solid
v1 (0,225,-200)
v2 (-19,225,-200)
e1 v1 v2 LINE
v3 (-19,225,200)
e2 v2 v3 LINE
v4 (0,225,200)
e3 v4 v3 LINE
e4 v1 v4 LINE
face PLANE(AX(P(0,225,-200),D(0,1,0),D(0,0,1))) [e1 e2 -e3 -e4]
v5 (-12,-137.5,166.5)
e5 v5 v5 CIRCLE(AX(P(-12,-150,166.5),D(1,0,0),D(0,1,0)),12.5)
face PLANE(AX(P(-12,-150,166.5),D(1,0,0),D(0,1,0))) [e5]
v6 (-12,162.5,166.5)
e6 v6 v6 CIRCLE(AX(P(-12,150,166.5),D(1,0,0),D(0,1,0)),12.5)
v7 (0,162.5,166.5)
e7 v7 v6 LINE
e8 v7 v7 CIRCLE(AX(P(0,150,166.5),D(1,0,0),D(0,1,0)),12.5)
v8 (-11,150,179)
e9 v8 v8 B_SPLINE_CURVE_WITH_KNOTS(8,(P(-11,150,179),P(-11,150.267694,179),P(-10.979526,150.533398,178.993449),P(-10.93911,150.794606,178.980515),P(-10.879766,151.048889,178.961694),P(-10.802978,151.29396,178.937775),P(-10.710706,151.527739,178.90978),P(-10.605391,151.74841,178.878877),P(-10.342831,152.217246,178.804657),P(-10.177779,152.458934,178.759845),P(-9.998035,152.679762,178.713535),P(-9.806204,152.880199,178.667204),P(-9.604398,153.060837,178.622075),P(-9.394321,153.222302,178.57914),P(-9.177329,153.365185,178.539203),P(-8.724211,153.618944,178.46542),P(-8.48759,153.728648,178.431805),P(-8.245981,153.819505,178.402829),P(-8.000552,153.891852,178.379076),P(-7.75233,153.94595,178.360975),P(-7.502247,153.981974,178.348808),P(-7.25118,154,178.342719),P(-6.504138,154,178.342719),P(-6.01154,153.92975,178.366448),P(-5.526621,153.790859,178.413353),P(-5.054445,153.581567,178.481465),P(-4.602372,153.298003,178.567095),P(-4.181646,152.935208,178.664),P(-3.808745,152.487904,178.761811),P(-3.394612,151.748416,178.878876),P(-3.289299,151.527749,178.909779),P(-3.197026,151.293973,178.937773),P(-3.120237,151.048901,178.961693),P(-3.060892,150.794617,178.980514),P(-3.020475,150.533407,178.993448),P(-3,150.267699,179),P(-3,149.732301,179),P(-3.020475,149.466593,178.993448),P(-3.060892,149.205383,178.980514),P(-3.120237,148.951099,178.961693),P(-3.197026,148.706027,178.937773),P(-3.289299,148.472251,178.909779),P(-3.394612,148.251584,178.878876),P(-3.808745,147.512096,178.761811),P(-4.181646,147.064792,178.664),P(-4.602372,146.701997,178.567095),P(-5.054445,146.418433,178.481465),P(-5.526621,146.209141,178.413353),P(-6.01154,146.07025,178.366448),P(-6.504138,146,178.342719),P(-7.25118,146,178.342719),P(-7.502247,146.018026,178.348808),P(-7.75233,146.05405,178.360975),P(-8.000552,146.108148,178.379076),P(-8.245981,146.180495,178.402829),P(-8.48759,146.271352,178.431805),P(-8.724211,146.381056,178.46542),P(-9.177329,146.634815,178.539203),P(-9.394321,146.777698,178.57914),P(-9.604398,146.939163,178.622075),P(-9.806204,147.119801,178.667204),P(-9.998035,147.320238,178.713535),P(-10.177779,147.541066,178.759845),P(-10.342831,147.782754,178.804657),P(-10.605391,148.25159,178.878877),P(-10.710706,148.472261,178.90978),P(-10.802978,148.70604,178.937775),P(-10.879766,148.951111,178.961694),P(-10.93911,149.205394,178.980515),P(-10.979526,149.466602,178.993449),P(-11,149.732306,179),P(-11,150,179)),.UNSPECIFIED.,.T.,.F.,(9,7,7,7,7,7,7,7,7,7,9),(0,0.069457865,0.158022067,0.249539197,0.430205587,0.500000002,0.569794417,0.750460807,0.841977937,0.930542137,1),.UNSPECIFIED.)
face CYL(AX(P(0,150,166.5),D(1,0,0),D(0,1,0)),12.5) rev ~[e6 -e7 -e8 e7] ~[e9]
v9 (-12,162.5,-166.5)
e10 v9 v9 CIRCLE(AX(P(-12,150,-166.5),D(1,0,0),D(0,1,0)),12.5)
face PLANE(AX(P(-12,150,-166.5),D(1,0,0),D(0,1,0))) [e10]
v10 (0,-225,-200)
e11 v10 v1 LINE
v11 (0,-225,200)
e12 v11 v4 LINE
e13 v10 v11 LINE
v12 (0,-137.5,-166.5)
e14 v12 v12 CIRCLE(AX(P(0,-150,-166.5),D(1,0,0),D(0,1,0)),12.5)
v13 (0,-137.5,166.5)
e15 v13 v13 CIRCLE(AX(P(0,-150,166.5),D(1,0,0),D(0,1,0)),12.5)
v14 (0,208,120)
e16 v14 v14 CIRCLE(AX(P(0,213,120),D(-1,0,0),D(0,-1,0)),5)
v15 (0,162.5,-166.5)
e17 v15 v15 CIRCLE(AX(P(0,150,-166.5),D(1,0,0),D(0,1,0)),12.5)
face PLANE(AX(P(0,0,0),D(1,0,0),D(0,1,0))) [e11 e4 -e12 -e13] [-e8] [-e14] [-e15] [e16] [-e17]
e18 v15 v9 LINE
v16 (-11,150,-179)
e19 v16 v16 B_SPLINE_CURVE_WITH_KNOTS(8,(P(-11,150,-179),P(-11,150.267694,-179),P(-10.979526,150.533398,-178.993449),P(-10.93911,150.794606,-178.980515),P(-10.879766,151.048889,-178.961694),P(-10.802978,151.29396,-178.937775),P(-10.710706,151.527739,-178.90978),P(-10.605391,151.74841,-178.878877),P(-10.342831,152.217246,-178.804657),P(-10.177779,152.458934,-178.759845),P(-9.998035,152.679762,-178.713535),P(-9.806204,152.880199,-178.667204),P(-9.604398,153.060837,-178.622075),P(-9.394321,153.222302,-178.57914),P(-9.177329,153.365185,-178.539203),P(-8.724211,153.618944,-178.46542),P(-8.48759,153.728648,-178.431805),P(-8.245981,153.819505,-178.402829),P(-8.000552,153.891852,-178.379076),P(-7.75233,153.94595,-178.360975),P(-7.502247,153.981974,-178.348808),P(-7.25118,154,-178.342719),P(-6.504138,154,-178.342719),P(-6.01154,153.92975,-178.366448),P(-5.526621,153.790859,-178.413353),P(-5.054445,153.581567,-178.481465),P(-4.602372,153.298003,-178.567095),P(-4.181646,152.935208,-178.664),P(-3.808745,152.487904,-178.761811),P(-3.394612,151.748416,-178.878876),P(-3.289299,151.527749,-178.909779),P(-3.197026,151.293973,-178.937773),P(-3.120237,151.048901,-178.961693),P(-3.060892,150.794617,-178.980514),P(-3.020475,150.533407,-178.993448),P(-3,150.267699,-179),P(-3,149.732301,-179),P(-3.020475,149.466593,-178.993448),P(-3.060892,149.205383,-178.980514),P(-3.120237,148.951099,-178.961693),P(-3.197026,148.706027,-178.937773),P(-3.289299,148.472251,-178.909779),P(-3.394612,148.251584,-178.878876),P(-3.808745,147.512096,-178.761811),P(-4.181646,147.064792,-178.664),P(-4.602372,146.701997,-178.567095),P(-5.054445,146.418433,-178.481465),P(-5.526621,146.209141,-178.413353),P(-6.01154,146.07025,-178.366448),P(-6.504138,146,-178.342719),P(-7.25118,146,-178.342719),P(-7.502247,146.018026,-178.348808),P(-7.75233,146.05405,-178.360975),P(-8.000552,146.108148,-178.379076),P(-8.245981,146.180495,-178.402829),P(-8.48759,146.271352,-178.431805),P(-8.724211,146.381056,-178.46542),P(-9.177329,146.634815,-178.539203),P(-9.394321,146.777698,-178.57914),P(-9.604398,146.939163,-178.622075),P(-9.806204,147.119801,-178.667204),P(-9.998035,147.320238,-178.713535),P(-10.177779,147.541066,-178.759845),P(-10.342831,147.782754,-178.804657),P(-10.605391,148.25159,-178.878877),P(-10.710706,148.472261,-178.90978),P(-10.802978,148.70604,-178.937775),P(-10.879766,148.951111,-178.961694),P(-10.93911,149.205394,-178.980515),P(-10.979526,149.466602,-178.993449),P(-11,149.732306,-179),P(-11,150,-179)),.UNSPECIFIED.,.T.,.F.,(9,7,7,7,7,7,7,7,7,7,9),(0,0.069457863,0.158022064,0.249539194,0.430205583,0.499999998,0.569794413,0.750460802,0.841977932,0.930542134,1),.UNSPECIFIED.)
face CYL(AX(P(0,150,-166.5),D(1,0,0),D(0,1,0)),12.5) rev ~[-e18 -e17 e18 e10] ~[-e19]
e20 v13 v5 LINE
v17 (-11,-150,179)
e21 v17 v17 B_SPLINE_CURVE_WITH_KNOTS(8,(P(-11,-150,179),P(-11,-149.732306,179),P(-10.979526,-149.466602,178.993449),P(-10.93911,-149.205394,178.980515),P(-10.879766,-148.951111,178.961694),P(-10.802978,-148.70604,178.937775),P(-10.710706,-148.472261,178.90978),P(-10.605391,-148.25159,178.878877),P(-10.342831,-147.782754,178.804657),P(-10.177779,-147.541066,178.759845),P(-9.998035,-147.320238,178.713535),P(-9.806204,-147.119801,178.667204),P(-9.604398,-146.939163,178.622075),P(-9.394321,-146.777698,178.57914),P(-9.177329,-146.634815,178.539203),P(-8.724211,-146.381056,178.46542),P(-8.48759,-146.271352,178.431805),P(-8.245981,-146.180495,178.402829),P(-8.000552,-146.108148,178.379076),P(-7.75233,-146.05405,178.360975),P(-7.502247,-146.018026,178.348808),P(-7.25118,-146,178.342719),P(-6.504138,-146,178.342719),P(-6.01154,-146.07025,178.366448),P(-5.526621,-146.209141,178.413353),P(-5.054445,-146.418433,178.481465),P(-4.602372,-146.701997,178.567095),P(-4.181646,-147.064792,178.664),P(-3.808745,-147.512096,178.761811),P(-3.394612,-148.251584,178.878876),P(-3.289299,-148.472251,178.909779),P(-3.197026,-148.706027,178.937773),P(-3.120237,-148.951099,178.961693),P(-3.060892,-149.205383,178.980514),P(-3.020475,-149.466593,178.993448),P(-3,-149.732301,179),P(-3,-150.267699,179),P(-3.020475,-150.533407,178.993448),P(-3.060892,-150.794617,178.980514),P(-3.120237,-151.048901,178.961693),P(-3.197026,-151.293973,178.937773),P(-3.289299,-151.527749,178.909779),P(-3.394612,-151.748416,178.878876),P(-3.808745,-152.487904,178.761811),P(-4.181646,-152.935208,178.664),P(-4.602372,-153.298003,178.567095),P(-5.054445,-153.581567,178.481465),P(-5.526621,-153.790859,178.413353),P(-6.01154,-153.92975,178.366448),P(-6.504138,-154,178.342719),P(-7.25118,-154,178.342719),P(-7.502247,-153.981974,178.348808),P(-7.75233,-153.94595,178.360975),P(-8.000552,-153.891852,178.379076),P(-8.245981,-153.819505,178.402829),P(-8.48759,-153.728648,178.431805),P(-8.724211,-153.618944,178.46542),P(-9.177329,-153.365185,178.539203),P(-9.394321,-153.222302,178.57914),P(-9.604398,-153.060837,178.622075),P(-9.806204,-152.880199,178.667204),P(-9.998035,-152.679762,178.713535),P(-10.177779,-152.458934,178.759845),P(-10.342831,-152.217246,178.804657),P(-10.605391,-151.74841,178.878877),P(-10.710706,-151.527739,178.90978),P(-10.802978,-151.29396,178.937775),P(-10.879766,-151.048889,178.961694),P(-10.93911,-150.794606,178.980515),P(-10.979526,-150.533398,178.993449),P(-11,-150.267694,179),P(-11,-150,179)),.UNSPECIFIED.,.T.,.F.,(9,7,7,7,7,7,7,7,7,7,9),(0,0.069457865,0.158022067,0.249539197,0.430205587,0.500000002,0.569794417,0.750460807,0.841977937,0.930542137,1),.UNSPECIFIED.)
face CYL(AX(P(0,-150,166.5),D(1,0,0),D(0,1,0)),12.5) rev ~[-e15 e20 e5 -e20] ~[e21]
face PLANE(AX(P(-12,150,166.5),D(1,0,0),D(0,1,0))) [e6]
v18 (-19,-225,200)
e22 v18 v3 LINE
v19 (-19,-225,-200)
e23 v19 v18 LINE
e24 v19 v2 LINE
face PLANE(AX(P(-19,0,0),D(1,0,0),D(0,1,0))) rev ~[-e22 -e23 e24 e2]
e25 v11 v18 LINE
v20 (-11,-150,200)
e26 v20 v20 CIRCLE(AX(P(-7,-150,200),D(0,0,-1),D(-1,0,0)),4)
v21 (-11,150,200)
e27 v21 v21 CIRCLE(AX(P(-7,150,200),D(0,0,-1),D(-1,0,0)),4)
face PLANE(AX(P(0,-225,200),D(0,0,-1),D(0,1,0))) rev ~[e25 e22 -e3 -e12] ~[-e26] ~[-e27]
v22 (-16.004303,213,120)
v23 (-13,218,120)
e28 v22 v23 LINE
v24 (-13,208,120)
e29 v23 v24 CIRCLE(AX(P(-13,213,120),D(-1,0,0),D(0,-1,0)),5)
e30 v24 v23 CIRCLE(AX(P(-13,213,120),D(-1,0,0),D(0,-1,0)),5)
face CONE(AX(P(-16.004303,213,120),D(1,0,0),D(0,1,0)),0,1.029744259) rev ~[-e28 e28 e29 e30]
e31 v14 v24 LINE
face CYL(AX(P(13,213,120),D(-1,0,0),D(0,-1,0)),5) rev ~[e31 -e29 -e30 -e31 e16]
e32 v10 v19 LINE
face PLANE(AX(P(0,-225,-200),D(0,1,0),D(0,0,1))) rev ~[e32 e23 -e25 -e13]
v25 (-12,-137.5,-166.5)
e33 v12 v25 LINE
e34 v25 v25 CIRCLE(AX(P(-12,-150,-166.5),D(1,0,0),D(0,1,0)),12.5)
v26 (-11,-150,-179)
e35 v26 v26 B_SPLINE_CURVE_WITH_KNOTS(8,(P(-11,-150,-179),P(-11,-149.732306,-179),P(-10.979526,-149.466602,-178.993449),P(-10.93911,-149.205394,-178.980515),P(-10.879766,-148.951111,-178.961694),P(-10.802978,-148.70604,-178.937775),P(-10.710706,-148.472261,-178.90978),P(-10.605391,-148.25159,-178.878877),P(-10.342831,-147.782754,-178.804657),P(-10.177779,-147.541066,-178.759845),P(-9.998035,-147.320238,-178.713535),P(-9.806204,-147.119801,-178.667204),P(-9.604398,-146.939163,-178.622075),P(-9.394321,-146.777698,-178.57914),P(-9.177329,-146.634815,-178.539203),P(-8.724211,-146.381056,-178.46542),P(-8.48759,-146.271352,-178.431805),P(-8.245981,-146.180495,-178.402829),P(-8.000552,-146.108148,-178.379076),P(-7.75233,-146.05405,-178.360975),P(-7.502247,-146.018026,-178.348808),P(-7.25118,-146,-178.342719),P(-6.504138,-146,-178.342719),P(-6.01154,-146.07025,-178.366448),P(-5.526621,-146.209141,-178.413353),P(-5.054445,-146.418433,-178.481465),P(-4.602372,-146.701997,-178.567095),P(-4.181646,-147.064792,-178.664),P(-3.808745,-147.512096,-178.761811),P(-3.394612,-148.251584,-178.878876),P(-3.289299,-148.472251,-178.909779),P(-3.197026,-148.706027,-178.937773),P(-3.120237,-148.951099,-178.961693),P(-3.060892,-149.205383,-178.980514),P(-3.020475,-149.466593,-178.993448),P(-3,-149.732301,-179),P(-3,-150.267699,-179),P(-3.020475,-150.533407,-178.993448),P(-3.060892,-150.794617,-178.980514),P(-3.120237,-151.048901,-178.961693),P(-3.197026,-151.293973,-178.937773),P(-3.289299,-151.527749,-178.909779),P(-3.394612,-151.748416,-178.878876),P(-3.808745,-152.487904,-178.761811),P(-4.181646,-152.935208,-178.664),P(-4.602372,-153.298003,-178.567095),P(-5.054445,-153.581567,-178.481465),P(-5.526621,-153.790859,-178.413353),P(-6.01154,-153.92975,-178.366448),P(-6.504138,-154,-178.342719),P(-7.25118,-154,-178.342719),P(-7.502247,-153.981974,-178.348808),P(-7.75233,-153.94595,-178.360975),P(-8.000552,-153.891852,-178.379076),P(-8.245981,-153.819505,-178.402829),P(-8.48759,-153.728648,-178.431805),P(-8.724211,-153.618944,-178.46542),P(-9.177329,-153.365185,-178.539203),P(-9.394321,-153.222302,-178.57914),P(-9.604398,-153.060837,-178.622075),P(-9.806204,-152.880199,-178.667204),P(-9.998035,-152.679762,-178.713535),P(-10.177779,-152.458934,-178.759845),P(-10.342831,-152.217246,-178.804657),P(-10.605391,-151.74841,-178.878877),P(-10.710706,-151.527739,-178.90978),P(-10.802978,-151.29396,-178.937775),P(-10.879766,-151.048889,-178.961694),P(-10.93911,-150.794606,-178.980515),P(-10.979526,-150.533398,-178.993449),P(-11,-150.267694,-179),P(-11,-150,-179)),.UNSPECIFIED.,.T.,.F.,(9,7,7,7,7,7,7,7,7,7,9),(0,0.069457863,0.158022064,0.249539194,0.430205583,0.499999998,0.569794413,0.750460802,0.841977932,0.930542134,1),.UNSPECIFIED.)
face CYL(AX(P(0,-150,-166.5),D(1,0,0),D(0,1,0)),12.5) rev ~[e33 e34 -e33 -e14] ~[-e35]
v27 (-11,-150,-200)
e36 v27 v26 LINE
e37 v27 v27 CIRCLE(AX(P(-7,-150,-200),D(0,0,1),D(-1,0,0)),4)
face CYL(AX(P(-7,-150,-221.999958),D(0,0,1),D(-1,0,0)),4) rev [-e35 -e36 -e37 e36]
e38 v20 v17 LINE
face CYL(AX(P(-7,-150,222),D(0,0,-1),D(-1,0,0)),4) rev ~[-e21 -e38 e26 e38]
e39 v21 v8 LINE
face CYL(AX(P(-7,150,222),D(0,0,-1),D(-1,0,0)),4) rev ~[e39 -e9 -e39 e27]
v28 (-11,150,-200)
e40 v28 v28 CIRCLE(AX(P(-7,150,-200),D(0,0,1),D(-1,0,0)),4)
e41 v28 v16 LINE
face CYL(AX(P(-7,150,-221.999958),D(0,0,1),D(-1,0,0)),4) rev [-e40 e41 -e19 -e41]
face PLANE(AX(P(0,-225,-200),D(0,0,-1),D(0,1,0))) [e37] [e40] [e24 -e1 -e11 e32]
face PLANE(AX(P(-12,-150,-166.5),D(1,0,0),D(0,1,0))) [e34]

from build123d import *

# Parameters (mm, degrees)
F0_W     = 450
F0_H     = 400
F1_DEPTH = 19
F2_R     = 12.5
F3_DEPTH = 12
F5_D     = 8
F5_DEPTH = 22
F5_TIP   = 2.4034424761
F7_D     = 10
F7_DEPTH = 13
F7_TIP   = 3.0043030951


# Not quite as in the source:
# - a pattern or mirror of a feature is missing from the dataset's text; its kind, count and spacing are read off the source's solid


with BuildPart() as f1:
    # F0 (on Right) → F1 (new body)
    with BuildSketch(Plane.YZ):
        Rectangle(F0_W, F0_H)
    extrude(amount=-F1_DEPTH)

    # F2 (on face) → F3 (cut)
    with BuildSketch(Plane.YZ):
        with Locations((-150, -166.5)):
            Circle(F2_R)
        with Locations((150, -166.5)):
            Circle(F2_R)
        with Locations((-150, 166.5)):
            Circle(F2_R)
        with Locations((150, 166.5)):
            Circle(F2_R)
    extrude(amount=-F3_DEPTH, mode=Mode.SUBTRACT)

    # F5
    with Locations(Plane.XY.offset(200)):
        with Locations((-7, 150), (-7, -150)):
            f5 = Hole(F5_D / 2, depth=F5_DEPTH)
            with Locations((0, 0, -(F5_DEPTH + F5_TIP / 2))):  # 118° drill point
                Cone(0, F5_D / 2, F5_TIP, mode=Mode.SUBTRACT)

    # F5_copies: F5 across plane
    add(f5.mirror(Plane(origin=(0, 0, 2.1e-05), x_dir=(-1, 0, 0), z_dir=(0, 0, -1))), mode=Mode.SUBTRACT)

    # F7
    with Locations(Plane.YZ):
        with Locations((213, 120)):
            Hole(F7_D / 2, depth=F7_DEPTH)
            with Locations((0, 0, -(F7_DEPTH + F7_TIP / 2))):  # 118° drill point
                Cone(0, F7_D / 2, F7_TIP, mode=Mode.SUBTRACT)


solid = f1.part
